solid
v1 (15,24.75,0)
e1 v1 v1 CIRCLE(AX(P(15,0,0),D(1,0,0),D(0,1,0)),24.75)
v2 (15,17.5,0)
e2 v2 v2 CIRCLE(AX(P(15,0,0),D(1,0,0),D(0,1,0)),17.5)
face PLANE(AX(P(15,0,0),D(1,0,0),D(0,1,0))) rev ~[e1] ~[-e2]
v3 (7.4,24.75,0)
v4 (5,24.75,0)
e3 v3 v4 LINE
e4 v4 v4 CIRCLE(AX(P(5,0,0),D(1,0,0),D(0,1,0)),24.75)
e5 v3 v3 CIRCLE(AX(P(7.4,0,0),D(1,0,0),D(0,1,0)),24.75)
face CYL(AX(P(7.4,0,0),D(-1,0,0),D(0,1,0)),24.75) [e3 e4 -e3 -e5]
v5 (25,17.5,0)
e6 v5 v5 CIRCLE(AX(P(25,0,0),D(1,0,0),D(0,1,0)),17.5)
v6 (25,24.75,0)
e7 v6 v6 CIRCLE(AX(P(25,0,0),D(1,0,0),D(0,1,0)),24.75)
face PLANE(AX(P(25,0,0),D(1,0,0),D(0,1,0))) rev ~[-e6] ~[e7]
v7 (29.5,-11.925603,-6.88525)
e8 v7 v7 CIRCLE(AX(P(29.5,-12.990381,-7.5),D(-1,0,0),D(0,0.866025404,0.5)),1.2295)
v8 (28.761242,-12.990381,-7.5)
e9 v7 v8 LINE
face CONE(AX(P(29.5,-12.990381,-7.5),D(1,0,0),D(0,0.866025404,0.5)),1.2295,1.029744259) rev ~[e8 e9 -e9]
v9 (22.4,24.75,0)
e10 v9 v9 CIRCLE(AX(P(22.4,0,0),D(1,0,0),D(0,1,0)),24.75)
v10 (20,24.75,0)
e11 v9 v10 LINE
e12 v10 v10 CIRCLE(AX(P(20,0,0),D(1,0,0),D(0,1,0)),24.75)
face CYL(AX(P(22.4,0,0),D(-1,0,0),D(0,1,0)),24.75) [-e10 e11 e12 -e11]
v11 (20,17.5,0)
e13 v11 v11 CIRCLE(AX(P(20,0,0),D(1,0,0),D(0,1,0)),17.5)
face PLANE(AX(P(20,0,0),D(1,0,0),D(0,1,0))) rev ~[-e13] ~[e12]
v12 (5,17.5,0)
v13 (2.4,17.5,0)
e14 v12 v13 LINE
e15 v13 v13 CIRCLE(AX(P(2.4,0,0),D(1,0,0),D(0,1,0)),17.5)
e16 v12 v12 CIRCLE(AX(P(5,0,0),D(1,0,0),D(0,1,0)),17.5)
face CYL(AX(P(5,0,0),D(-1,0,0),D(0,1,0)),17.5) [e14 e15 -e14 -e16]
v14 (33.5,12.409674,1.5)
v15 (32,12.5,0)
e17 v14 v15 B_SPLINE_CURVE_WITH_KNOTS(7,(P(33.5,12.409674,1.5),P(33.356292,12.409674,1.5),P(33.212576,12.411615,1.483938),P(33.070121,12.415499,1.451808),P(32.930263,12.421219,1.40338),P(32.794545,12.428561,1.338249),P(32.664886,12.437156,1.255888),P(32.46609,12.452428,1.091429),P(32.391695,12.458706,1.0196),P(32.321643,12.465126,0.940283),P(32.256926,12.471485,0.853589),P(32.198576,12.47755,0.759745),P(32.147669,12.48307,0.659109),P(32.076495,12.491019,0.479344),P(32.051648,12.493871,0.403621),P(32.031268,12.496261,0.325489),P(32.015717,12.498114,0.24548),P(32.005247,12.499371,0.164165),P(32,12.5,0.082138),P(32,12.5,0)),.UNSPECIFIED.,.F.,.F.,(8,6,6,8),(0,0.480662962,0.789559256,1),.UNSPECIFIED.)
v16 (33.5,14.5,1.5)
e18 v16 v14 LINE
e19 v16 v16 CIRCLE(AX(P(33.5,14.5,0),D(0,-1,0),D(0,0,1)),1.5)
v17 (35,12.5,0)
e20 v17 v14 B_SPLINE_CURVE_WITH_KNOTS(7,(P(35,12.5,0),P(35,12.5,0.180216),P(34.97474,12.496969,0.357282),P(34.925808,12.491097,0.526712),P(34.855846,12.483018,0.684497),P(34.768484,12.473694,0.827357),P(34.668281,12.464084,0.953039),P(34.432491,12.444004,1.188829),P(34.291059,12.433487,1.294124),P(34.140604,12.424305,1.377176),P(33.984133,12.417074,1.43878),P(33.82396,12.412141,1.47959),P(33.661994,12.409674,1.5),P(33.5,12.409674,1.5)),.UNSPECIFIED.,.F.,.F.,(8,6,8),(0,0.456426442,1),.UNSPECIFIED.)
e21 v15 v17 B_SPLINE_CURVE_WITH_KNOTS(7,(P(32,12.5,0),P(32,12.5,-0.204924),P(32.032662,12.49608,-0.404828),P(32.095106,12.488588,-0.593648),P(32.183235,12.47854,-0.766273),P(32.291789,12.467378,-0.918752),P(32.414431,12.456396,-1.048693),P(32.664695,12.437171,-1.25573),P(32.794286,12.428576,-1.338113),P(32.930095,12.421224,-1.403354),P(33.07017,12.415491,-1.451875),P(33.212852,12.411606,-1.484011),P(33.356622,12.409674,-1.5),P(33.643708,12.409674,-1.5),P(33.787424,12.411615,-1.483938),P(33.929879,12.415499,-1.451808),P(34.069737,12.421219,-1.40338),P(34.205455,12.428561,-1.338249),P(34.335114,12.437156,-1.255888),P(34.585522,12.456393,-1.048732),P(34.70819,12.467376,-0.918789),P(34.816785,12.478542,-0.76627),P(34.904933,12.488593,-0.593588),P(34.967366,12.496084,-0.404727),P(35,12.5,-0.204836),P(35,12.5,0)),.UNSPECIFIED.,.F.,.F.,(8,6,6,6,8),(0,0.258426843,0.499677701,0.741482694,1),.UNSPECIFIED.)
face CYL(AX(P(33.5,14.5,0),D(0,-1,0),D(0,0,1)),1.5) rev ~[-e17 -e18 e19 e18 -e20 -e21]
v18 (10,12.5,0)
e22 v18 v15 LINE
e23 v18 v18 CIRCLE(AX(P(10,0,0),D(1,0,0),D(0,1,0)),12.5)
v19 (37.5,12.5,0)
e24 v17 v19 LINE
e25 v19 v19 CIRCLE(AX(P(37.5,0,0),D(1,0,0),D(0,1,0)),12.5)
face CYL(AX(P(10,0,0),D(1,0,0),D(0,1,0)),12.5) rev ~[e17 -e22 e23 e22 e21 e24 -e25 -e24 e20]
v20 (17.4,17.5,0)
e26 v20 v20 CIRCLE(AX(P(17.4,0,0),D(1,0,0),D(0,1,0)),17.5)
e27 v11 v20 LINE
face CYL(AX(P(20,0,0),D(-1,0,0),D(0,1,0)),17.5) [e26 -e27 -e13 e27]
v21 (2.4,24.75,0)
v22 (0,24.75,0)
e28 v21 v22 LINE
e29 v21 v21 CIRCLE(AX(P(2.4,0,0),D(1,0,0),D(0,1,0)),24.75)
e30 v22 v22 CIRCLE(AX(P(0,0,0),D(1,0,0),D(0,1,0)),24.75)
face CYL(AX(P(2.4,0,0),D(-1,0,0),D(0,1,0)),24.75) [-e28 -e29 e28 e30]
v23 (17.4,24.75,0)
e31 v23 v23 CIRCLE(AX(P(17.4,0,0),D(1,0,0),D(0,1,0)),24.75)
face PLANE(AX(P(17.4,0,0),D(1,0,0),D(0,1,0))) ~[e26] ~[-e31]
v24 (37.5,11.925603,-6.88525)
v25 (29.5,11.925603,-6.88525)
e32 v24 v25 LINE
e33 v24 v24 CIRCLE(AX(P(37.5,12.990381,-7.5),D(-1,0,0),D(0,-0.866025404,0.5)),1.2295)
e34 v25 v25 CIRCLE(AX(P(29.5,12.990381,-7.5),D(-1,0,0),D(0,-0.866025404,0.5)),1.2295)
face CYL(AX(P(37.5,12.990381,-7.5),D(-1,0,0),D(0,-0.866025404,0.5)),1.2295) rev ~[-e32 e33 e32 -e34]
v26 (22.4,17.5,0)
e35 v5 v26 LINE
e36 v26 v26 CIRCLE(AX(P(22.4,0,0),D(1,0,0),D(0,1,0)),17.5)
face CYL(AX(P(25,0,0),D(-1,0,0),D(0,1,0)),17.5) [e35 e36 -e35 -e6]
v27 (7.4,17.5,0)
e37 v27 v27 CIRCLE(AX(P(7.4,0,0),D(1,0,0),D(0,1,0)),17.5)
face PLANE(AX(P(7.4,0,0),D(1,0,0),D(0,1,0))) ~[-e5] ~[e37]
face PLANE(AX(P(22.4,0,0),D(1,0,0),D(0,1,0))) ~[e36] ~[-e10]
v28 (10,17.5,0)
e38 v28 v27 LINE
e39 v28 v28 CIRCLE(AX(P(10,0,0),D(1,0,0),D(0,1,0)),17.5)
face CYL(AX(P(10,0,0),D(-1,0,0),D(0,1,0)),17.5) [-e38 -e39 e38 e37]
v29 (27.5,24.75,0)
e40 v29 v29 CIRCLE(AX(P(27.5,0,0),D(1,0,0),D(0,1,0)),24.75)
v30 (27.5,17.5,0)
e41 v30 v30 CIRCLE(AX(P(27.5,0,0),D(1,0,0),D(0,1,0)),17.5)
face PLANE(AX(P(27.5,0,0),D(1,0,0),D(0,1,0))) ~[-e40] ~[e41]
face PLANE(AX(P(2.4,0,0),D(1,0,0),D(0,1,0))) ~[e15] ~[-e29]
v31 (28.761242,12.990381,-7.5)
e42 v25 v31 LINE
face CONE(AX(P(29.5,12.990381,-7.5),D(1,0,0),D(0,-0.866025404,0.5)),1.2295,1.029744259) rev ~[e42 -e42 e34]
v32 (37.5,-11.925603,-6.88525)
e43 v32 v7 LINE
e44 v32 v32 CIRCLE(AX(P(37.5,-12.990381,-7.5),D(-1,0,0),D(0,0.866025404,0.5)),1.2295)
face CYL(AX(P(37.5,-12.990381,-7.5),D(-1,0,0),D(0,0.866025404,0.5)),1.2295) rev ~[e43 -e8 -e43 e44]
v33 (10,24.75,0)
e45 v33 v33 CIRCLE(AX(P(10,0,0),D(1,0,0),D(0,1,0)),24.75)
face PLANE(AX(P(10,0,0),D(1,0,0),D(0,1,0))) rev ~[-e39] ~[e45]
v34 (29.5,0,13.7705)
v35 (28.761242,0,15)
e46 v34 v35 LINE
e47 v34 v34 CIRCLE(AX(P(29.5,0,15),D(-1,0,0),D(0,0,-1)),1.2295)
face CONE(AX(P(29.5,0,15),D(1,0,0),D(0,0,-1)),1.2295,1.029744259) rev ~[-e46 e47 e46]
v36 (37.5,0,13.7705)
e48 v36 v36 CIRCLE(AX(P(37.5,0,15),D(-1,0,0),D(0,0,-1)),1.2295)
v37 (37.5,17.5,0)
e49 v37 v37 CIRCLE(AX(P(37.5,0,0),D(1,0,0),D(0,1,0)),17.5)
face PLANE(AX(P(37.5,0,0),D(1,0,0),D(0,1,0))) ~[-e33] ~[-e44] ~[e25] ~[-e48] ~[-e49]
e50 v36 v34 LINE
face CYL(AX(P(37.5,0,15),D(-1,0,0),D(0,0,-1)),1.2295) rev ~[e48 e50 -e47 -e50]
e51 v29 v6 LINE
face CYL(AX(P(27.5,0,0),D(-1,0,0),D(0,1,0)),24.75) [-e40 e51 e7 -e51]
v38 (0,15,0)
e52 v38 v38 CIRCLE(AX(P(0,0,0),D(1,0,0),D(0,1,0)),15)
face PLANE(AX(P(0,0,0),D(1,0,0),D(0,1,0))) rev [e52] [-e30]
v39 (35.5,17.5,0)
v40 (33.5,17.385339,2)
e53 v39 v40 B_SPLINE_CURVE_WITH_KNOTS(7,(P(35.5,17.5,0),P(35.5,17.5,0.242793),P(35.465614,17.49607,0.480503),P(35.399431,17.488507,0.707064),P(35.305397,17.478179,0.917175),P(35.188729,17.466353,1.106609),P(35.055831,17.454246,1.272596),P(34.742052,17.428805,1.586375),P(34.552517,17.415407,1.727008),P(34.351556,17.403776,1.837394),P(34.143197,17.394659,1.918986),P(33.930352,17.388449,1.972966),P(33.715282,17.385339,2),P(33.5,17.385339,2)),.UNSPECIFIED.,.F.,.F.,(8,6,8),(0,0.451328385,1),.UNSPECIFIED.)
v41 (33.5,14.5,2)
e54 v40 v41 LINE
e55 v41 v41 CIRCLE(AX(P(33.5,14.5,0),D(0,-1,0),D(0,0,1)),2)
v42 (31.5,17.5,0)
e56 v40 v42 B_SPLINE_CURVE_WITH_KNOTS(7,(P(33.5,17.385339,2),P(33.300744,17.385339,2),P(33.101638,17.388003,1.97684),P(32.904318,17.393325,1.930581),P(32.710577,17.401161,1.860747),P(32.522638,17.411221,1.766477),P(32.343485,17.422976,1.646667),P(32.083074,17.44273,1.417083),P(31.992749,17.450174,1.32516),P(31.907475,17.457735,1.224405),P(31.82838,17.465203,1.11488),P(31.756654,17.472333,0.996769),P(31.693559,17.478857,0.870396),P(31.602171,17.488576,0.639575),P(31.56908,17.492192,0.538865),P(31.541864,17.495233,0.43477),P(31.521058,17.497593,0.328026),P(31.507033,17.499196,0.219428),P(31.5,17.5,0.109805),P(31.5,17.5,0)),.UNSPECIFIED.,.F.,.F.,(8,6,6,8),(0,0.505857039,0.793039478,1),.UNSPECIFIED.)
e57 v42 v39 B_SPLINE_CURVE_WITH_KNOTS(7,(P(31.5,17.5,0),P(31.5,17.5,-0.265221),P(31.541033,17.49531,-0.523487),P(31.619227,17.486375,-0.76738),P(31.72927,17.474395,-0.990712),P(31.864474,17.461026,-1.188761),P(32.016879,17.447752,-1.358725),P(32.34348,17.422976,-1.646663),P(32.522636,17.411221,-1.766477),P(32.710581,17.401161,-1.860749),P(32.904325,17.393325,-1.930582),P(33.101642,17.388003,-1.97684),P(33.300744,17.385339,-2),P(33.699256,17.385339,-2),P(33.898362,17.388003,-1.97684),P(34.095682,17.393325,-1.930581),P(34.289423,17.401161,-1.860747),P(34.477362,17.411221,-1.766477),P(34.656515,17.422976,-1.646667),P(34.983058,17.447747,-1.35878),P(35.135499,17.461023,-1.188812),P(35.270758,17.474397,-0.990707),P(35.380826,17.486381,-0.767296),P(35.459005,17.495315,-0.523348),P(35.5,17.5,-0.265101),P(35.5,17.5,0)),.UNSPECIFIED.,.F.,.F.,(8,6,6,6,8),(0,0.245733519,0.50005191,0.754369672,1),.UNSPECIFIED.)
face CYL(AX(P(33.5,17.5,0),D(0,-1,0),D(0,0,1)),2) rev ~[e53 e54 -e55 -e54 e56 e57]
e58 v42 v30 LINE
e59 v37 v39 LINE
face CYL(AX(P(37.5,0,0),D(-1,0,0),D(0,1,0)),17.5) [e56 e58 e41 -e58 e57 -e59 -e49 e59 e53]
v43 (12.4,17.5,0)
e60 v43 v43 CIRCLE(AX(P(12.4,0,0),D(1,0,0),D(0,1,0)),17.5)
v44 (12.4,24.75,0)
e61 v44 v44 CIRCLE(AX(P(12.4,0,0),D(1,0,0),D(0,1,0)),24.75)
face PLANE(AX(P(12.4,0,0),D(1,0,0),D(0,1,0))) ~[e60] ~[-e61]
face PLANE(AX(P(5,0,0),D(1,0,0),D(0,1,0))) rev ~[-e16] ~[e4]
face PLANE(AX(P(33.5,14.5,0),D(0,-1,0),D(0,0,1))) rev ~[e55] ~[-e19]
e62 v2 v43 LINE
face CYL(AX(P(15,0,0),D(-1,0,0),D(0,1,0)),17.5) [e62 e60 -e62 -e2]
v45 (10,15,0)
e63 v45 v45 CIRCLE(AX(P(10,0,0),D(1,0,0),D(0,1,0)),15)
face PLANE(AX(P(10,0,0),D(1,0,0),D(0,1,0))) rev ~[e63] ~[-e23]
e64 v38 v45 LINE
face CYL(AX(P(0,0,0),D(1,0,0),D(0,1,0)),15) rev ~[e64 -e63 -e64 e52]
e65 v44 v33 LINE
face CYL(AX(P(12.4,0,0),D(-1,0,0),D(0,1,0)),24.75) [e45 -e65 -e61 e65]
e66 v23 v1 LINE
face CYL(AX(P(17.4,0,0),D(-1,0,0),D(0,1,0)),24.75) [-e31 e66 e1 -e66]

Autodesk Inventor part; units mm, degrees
ref_plane "YZ Plane" through (0, 0, 0) normal (1, 0, 0) x (0, 1, 0)
ref_plane "XY Plane" through (0, 0, 0) normal (0, 0, 1) x (1, 0, 0)
sketch "Skizze2" plane through (0, 0, 0) normal (0, 0, 1) x (1, 0, 0)
  line L0 (0, -4.95) -> (0, 29.7) projected
  line L1 (-7.5, 0) -> (45, 0) projected
  line L2 (10, 12.5) -> (37.5, 12.5)
  line L3 (37.5, 12.5) -> (37.5, 17.5)
  line L4 (37.5, 17.5) -> (27.5, 17.5)
  line L5 (27.5, 17.5) -> (27.5, 24.75)
  line L6 (27.5, 24.75) -> (25, 24.75)
  line L7 (25, 24.75) -> (25, 17.5)
  line L8 (25, 17.5) -> (22.4, 17.5)
  line L9 (22.4, 17.5) -> (22.4, 24.75)
  line L10 (22.4, 24.75) -> (20, 24.75)
  line L11 (20, 24.75) -> (20, 17.5)
  line L12 (20, 17.5) -> (17.4, 17.5)
  line L13 (17.4, 17.5) -> (17.4, 24.75)
  line L14 (17.4, 24.75) -> (15, 24.75)
  line L15 (15, 24.75) -> (15, 17.5)
  line L16 (15, 17.5) -> (12.4, 17.5)
  line L17 (12.4, 17.5) -> (12.4, 24.75)
  line L18 (12.4, 24.75) -> (10, 24.75)
  line L19 (10, 24.75) -> (10, 17.5)
  line L20 (10, 17.5) -> (7.4, 17.5)
  line L21 (7.4, 17.5) -> (7.4, 24.75)
  line L22 (7.4, 24.75) -> (5, 24.75)
  line L23 (5, 24.75) -> (5, 17.5)
  line L24 (5, 17.5) -> (2.4, 17.5)
  line L25 (2.4, 17.5) -> (2.4, 24.75)
  line L26 (2.4, 24.75) -> (0, 24.75)
  line L27 (0, 24.75) -> (0, 15)
  line L28 (0, 15) -> (10, 15)
  line L29 (10, 15) -> (10, 12.5)
  point P0 (0, 0)
  dimension "d3" = 37.5
  dimension "d4" = 10
  dimension "d5" = 49.5
  dimension "d6" = 35
  dimension "d7" = 2.4
  dimension "d8" = 2.6
  dimension "d10" = 25
  dimension "d11" = 10
  dimension "d13" = 2.4
  dimension "d14" = 25
  dimension "d15" = 30
  dimension "d16" = 2.4
  dimension "d17" = 2.6
  dimension "d19" = 2.4
  dimension "d20" = 2.6
  dimension "d21" = 2.4
revolve "Umdrehung1" add sketch "Skizze2" angle 360 about axis through (-10, 0, 0) along (1, 0, 0)
sketch "Skizze4" plane through (37.5, 0, 0) normal (1, 0, 0) x (0, 0, -1)
  line L0 (0, -34.65) -> (0, 34.65) projected
  line L1 (34.65, 0) -> (-34.65, 0) projected
  circle A0 centre (0, 0) radius 15 projected
  point P0 (-15, 0)
hole "Bohrung1" at (37.5, 0, 15) direction (-1, 0, 0) diameter 2.459 depth 8 tip angle 118 thread size "M3x0.5" class "6H" standard "ISO Metric profile"
pattern_circular "Runde Anordnung1" count 3 over 360 about axis through (23.75, 0, 0) along (1, 0, 0) of "Bohrung1"
ref_plane "Arbeitsebene1" through (32.5, 17.5, 0) normal (0, 1, 0) x (-1, 0, 0)
sketch "Skizze5" plane through (32.5, 17.5, 0) normal (0, 1, 0) x (-1, 0, 0)
  line L0 (40, 0) -> (-12.5, 0) projected
  line L1 (-5, 17.5) -> (-5, -17.5) projected
  point P0 (32.5, 0)
  point P1 (-1, 0)
  dimension "d34" = 4
hole "Bohrung2" at (33.5, 17.5, 0) direction (0, -1, 0) diameter 3 end up to surface counterbore diameter 4 counterbore depth 3
properties part number "Kühlkörper"
